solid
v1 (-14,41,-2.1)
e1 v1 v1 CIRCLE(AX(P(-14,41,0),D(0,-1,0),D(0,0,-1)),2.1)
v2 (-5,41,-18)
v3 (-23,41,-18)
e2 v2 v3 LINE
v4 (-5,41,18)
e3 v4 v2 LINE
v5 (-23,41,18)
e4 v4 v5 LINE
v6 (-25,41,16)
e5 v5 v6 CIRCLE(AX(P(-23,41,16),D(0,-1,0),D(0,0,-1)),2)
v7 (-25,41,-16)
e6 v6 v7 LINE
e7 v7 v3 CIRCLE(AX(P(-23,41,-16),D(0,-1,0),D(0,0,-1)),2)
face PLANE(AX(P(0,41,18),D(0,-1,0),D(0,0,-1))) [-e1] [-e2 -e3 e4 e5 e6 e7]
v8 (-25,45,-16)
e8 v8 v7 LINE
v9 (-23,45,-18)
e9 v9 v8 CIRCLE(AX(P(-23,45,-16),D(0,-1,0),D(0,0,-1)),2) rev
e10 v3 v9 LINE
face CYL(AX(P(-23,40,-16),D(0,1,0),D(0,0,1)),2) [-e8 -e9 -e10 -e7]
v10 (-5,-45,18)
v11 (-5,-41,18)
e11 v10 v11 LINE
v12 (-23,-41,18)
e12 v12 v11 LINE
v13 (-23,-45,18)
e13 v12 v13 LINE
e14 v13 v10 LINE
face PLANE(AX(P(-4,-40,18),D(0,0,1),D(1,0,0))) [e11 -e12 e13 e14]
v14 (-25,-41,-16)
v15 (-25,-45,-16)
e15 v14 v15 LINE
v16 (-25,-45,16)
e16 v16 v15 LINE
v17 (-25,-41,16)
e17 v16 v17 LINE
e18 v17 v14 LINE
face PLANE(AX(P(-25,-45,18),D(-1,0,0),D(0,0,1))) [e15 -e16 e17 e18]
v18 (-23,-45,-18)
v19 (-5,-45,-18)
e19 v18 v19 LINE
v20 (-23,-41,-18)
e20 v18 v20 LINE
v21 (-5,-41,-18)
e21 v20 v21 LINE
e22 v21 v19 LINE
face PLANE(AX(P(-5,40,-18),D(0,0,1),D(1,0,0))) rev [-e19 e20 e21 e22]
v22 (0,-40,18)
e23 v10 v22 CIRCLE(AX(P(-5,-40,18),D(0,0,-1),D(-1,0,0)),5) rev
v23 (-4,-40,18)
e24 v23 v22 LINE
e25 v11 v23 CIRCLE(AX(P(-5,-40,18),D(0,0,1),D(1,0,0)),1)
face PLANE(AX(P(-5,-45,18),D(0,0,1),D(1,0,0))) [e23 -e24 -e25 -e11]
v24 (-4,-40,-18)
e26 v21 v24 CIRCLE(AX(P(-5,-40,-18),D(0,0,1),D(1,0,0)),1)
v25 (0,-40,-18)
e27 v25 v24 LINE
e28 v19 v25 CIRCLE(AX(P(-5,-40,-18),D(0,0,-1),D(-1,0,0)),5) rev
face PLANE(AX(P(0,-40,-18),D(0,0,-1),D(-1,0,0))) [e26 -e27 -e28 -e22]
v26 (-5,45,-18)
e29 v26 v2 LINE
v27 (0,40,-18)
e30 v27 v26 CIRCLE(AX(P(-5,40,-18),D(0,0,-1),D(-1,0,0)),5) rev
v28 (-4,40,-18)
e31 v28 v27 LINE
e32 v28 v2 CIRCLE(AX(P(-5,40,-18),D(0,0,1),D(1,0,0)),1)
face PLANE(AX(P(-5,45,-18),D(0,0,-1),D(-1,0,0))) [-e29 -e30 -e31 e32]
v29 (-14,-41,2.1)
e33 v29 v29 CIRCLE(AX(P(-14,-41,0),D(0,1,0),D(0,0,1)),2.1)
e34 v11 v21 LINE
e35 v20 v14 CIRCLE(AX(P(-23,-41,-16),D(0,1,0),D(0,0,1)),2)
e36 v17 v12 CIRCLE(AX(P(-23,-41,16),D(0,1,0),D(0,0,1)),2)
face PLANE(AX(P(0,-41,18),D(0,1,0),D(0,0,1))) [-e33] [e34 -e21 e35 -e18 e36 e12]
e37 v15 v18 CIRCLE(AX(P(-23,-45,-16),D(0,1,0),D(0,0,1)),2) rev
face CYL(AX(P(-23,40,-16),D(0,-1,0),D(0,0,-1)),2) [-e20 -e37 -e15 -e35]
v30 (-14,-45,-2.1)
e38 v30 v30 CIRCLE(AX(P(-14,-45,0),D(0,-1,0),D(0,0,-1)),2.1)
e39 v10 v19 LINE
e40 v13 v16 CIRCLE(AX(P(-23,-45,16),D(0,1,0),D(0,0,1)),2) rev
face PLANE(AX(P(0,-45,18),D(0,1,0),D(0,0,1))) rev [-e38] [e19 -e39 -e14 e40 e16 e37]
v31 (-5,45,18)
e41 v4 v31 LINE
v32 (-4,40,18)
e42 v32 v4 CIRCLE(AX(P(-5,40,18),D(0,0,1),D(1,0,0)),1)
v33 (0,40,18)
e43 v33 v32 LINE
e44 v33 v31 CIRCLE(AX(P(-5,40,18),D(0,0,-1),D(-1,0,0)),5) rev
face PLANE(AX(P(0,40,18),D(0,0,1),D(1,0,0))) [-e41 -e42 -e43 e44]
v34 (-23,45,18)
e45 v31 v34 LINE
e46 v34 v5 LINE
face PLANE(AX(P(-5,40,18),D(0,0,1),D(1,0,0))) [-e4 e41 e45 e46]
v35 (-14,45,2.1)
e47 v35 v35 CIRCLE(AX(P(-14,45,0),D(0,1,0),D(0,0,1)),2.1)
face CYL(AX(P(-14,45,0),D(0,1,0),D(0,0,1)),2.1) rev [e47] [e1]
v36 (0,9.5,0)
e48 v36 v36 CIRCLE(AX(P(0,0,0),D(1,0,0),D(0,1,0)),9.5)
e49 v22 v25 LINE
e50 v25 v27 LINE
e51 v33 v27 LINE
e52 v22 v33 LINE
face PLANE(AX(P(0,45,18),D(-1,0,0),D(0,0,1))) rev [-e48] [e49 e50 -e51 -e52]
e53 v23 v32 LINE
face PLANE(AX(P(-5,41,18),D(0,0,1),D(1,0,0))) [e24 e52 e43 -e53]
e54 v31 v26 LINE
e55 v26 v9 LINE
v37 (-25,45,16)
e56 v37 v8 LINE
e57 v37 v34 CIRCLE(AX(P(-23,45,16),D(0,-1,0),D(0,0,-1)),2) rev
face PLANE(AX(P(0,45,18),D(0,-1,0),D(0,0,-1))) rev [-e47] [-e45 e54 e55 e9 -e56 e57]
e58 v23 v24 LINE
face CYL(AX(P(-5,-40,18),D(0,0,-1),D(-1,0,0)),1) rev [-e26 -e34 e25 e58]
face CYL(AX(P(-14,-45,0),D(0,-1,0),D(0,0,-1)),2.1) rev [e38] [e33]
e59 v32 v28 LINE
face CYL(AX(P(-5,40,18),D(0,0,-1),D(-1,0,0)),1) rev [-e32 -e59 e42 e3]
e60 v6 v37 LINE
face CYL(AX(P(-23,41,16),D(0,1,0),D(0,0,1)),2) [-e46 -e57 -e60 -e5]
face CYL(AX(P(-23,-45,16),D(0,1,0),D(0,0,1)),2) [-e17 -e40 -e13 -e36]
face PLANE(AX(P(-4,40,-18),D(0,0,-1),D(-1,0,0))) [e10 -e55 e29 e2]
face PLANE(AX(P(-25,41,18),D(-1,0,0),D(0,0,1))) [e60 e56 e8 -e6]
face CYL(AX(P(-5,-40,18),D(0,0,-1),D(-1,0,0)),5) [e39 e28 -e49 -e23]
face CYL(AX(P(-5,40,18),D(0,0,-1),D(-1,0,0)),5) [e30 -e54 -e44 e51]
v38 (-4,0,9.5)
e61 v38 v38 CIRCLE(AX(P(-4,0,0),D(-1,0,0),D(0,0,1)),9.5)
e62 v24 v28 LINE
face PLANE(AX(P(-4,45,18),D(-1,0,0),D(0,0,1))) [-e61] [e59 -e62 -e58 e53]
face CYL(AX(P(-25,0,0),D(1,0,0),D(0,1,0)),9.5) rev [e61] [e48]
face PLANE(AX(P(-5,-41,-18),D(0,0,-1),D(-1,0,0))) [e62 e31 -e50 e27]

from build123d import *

# Parameters (mm, degrees)
BASE_FLANGE1_START    = -18
BASE_FLANGE1_DEPTH    = 36
FILLET1_R             = 2
M5_TAPPED_HOLE1_D     = 4.2
M5_TAPPED_HOLE1_DEPTH = 4
SKETCH8_R             = 9.5
CUT_EXTRUDE1_DEPTH    = 55.534392818


# Read off the part's stored shape, not the designer's step: Base-Flange1
with BuildPart() as part:
    # Base-Flange1 outline → Base-Flange1 (new body)
    with BuildSketch(Plane.XY.offset(BASE_FLANGE1_START)):
        with BuildLine():
            Line((-5, 45), (-25, 45))
            Line((-25, 45), (-25, 41))
            Line((-25, 41), (-5, 41))
            ThreePointArc((-5, 41), (-4.292893219, 40.707106781), (-4, 40))
            Line((-4, 40), (-4, -40))
            ThreePointArc((-4, -40), (-4.292893219, -40.707106781), (-5, -41))
            Line((-5, -41), (-25, -41))
            Line((-25, -41), (-25, -45))
            Line((-25, -45), (-5, -45))
            ThreePointArc((-5, -45), (-1.464466094, -43.535533906), (0, -40))
            Line((0, -40), (0, 40))
            ThreePointArc((0, 40), (-1.464466094, 43.535533906), (-5, 45))
        make_face()
    extrude(amount=BASE_FLANGE1_DEPTH)

    # Fillet1
    fillet1_edges = [part.edges().sort_by_distance(p)[0] for p in [
        (-25, -43, -18),
        (-25, 43, -18),
        (-25, -43, 18),
        (-25, 43, 18),
    ]]
    fillet(fillet1_edges, radius=FILLET1_R)

    # M5 Tapped Hole1
    with Locations(Plane(origin=(0, 45, 0), x_dir=(1, 0, 0), z_dir=(0, 1, 0))):
        with Locations((-14, 0)):
            m5_tapped_hole1 = Hole(M5_TAPPED_HOLE1_D / 2, depth=M5_TAPPED_HOLE1_DEPTH)

    # Mirror1: M5 Tapped Hole1 across plane
    add(m5_tapped_hole1.mirror(Plane.ZX), mode=Mode.SUBTRACT)

    # Sketch8 → Cut-Extrude1 (cut, through all)
    with BuildSketch(Plane(origin=(0, 0, 0), x_dir=(0, 0, -1), z_dir=(1, 0, 0))):
        with Locations(Location((0, 0, 0), (0, 0, 90))):
            Circle(SKETCH8_R)
    extrude(amount=-CUT_EXTRUDE1_DEPTH, mode=Mode.SUBTRACT)


solid = part.part
